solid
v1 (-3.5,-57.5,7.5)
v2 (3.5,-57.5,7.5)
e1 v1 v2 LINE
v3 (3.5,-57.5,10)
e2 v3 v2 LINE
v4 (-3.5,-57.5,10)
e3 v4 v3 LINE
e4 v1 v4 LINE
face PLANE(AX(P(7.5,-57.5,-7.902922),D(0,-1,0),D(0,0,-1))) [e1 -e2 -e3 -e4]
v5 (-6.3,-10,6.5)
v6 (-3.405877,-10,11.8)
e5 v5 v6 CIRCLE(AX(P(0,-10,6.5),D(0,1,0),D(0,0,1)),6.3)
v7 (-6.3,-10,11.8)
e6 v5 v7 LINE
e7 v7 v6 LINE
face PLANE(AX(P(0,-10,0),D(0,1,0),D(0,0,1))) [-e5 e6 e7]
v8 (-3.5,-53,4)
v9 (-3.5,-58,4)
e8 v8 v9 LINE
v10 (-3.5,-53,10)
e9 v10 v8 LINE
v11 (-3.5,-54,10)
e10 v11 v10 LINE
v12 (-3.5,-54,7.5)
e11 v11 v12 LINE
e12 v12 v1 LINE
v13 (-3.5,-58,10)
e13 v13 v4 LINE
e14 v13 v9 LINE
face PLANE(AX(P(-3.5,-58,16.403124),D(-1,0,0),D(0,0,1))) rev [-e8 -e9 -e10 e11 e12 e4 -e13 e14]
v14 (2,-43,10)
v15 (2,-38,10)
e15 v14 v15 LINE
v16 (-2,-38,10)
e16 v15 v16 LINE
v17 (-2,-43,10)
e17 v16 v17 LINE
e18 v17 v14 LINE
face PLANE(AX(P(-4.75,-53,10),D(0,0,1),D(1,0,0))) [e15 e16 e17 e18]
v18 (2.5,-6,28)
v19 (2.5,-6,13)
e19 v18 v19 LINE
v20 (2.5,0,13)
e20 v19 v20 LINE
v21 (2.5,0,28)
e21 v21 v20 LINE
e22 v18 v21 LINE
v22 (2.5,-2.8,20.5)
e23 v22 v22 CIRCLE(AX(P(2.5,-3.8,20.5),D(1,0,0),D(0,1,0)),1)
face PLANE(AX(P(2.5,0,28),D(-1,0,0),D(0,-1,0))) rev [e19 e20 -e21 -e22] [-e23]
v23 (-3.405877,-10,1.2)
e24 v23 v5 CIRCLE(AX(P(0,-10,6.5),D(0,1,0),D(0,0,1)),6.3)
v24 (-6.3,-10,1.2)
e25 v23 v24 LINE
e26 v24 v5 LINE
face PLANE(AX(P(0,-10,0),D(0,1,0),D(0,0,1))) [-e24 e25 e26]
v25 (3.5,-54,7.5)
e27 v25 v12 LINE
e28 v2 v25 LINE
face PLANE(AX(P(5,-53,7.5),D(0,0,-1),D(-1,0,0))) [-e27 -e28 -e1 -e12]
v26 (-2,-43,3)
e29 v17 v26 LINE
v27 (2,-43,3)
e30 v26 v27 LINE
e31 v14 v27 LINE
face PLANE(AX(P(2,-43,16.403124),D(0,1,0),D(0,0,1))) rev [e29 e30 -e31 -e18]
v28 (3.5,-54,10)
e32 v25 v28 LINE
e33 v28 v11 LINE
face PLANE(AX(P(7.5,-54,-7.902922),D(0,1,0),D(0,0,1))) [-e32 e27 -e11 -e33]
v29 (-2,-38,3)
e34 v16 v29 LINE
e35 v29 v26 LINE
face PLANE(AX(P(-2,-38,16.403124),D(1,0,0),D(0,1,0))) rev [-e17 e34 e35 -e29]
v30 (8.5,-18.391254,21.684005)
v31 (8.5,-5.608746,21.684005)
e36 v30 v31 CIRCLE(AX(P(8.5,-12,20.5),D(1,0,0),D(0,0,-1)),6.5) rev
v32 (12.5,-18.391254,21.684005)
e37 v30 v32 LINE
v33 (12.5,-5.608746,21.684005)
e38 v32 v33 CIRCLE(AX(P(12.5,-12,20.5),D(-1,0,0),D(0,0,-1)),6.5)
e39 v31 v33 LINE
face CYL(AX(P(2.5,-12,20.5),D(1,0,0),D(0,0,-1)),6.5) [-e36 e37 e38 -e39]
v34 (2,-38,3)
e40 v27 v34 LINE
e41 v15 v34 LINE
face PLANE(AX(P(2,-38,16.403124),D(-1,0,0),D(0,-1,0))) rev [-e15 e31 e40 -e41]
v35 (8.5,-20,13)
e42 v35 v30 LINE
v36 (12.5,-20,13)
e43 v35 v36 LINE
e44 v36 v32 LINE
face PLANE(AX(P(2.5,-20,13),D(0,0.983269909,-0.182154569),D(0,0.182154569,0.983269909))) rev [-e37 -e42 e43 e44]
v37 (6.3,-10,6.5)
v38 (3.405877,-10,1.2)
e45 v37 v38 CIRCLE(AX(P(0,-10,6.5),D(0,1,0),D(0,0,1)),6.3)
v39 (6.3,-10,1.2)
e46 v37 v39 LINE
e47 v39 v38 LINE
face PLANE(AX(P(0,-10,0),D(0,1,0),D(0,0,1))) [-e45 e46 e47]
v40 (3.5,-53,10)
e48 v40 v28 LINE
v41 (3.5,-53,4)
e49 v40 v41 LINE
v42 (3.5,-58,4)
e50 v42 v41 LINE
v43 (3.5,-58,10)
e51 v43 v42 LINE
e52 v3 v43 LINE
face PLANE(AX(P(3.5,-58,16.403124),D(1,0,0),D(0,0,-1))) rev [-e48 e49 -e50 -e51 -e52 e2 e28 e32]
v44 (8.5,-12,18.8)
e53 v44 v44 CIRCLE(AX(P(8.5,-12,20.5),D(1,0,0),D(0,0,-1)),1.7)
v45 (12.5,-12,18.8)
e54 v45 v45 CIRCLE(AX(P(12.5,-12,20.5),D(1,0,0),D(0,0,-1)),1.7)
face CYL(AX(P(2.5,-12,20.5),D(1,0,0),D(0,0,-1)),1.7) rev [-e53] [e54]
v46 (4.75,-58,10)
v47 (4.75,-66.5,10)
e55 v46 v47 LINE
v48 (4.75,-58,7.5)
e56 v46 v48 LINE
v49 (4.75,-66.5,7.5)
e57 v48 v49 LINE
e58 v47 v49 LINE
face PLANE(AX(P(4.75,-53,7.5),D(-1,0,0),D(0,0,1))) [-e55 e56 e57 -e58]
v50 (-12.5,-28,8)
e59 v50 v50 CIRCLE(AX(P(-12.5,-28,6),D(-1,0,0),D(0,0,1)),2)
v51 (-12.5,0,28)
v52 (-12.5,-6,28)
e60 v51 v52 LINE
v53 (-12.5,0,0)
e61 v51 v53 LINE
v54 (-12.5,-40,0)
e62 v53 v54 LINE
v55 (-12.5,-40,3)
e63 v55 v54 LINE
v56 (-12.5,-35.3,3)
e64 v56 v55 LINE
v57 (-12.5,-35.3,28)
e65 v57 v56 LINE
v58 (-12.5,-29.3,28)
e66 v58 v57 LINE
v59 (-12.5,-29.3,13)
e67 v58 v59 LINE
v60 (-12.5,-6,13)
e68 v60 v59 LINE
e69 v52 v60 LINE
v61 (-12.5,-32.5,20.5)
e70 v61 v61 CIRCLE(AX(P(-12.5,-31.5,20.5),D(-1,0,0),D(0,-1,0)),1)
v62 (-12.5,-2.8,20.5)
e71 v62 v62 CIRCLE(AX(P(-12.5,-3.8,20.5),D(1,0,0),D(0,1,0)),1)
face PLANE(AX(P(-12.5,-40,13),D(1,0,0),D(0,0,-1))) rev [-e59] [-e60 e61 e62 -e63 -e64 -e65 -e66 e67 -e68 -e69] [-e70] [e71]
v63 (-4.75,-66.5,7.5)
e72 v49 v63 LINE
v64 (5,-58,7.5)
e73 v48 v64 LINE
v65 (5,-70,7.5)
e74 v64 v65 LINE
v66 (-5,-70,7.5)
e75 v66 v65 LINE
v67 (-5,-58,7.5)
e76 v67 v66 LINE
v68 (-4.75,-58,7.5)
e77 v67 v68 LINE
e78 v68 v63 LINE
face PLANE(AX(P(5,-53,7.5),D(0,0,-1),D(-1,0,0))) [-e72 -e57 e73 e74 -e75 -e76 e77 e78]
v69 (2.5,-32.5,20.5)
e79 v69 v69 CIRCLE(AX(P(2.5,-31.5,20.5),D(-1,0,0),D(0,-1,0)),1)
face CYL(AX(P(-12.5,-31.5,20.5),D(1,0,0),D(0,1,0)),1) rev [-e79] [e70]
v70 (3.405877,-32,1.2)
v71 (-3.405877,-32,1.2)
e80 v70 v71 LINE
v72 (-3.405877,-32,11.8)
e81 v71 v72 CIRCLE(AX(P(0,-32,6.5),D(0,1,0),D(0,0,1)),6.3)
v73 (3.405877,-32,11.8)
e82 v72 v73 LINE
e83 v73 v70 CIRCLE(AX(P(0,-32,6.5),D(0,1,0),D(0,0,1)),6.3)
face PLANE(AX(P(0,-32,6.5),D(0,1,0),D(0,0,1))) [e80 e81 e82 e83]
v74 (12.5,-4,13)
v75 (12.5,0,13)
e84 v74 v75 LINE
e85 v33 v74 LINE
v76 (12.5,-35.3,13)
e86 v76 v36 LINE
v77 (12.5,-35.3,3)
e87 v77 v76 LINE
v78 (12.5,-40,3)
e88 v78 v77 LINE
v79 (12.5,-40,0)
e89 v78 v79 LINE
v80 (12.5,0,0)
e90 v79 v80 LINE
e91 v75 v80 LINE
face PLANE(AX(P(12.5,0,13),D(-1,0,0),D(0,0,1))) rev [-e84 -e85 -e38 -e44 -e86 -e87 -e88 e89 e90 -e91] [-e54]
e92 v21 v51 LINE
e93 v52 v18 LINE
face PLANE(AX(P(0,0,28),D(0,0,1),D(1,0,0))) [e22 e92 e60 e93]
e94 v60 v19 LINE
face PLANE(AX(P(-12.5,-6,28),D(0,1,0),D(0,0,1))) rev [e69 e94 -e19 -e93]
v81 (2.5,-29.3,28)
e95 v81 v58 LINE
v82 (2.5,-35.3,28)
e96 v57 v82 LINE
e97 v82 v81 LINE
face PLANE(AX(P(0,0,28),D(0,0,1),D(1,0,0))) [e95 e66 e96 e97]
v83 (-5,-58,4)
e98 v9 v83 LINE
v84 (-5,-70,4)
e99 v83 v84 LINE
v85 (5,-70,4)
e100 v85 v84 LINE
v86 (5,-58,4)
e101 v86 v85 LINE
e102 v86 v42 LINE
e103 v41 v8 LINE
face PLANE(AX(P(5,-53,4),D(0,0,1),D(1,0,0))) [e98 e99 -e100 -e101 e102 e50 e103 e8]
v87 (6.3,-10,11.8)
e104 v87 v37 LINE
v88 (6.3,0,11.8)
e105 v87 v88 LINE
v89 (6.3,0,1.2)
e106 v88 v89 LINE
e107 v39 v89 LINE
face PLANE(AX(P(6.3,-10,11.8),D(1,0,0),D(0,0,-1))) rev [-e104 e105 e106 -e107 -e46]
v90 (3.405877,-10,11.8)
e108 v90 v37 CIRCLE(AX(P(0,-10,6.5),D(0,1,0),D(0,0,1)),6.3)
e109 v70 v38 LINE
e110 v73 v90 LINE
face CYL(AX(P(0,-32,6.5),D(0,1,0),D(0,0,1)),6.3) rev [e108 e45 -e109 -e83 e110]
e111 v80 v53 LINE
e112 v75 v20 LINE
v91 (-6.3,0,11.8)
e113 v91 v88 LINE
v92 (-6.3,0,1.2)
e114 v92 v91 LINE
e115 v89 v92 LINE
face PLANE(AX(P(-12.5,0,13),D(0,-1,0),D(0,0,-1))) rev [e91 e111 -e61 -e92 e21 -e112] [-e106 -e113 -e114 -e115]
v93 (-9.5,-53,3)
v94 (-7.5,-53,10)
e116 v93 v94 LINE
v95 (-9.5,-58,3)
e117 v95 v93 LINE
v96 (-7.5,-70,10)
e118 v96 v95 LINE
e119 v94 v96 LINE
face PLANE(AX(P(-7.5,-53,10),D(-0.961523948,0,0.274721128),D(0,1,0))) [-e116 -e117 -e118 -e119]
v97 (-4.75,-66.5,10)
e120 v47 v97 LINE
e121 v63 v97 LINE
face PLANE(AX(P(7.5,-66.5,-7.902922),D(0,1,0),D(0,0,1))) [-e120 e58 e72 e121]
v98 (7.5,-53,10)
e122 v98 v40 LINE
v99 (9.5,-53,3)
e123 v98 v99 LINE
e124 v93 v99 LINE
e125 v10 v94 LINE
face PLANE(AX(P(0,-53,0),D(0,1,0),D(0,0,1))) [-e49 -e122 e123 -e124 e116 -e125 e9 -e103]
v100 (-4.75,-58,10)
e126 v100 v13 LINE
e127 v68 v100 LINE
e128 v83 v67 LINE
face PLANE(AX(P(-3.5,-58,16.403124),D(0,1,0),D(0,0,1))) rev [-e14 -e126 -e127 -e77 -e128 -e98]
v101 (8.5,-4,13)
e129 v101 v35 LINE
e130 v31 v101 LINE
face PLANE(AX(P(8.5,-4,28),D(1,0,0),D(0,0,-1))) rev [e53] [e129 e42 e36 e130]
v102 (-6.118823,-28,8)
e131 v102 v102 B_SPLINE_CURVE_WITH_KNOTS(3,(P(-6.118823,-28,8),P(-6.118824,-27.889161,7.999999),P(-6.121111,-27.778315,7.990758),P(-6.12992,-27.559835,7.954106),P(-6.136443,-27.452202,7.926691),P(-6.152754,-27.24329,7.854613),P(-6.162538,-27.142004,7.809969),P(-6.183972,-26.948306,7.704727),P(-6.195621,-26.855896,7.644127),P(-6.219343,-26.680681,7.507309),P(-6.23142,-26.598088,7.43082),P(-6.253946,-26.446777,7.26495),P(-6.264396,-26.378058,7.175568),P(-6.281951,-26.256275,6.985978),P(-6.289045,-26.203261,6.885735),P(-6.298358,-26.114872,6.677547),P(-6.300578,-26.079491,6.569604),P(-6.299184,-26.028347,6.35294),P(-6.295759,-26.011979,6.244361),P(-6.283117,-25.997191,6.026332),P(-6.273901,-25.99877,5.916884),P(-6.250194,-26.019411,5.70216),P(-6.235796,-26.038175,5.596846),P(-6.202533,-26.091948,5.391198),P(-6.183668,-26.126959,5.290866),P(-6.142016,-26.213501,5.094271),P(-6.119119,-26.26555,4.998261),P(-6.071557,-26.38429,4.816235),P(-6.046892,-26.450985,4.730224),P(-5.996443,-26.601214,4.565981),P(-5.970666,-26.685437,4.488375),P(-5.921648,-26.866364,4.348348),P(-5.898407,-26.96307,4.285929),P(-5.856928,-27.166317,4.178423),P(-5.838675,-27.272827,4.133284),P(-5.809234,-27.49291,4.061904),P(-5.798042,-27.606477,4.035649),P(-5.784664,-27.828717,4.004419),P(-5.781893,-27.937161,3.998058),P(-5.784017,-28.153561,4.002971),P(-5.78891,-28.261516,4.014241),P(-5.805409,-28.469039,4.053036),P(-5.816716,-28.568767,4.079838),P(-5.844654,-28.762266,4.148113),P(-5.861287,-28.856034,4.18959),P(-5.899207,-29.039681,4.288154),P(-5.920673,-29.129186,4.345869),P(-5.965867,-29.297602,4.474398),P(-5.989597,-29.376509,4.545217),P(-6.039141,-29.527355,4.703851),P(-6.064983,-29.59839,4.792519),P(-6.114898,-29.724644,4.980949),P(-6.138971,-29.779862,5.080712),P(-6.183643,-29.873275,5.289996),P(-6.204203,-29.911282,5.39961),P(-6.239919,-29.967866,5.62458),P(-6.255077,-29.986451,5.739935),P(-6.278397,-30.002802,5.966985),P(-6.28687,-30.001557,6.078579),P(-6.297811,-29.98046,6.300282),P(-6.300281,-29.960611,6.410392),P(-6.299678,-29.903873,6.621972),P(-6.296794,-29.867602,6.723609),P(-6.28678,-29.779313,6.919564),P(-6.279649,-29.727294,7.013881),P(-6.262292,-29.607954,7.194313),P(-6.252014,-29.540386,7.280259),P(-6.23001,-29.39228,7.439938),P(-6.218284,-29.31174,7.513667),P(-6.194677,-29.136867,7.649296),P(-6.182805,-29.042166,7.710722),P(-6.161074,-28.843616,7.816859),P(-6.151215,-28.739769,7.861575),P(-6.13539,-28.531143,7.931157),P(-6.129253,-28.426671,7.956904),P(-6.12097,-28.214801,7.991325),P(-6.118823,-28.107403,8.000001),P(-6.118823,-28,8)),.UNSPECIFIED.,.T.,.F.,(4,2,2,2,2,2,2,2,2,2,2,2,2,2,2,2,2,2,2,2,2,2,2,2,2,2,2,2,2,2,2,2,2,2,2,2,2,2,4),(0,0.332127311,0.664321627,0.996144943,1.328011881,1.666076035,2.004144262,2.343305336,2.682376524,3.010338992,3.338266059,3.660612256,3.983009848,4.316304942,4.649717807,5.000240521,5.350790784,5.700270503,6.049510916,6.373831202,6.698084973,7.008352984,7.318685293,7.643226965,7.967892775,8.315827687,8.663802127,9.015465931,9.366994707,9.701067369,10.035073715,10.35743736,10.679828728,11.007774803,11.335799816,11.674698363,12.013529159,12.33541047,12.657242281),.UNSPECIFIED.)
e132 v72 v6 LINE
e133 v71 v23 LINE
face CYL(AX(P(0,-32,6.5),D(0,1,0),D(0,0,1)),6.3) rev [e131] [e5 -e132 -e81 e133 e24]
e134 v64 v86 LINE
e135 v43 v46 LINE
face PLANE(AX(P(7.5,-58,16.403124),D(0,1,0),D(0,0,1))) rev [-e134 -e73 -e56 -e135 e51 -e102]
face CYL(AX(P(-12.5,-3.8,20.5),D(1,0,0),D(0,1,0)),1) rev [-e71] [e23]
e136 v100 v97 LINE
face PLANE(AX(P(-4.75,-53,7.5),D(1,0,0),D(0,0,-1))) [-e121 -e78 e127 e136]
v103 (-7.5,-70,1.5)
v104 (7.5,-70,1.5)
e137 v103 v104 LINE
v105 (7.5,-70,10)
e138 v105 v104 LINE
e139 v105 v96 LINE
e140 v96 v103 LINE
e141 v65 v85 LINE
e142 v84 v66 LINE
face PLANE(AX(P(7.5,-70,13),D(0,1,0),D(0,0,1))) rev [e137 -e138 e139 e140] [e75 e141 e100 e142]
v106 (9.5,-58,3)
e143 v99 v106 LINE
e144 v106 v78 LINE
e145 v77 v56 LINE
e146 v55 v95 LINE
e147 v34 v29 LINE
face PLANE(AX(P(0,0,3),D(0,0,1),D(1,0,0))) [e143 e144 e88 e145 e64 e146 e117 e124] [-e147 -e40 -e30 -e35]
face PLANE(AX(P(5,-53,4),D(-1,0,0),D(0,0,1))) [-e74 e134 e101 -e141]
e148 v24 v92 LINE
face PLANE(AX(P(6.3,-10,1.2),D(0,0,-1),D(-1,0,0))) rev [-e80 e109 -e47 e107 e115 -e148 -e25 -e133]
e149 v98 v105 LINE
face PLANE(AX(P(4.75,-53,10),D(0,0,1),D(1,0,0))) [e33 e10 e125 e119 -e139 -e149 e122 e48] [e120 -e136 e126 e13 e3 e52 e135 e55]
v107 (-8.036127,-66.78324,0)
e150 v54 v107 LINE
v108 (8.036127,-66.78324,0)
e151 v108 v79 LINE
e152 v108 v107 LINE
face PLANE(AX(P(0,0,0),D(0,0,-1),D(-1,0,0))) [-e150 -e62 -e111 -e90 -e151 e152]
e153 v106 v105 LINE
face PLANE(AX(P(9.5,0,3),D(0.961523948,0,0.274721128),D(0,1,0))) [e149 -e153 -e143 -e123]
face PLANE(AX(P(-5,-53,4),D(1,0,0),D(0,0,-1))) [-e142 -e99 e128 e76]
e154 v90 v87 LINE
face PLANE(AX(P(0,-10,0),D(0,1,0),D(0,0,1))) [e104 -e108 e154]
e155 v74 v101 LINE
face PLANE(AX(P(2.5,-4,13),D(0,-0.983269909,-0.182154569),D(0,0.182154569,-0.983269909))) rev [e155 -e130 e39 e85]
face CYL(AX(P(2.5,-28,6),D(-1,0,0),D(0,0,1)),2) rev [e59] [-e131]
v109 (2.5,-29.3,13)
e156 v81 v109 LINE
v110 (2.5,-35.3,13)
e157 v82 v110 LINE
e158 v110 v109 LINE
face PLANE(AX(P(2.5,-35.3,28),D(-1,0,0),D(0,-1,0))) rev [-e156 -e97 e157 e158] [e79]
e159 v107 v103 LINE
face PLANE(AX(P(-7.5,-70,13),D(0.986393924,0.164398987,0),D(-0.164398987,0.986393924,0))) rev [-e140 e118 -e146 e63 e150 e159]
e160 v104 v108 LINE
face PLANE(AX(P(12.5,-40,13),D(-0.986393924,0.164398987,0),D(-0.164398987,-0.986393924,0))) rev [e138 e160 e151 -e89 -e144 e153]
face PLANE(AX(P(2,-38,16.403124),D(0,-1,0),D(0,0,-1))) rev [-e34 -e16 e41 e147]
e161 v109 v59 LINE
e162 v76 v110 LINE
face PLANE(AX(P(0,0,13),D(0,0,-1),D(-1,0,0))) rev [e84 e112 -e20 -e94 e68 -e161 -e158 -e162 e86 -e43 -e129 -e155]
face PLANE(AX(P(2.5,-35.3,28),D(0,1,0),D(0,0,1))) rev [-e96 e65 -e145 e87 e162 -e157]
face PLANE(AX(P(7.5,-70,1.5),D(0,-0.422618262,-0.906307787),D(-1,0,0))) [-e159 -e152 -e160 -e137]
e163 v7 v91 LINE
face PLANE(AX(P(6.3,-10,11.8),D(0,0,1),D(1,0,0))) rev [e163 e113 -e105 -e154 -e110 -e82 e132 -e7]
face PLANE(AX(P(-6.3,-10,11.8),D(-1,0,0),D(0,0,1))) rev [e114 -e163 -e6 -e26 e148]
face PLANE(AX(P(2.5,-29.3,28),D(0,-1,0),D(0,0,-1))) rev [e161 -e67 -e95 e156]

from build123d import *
from OCP.BRepFilletAPI import BRepFilletAPI_MakeChamfer

# Parameters (mm, degrees)
RESSALTO_EXTRUS_O1_DEPTH = 13
ESBO_O2_W                = 15
ESBO_O2_H                = 6
ESBO_O2_W_2              = 4
ESBO_O2_H_2              = 16
RESSALTO_EXTRUS_O2_DEPTH = 15
ESBO_O3_R                = 1
CORTE_EXTRUS_O1_DEPTH    = 77.870020164
ESBO_O10_R               = 1.7
CORTE_EXTRUS_O4_DEPTH    = 10
ESBO_O11_W               = 25
ESBO_O11_H               = 34.7
CORTE_EXTRUS_O5_DEPTH    = 10
RESSALTO_EXTRUS_O3_DEPTH = 17
RESSALTO_EXTRUS_O4_REACH = 77.374
ESBO_O7_W                = 4
ESBO_O7_H                = 5
ESBO_O8_W                = 15
ESBO_O8_H                = 3.5
RESSALTO_EXTRUS_O5_DEPTH = 2.5
CHANFRO2_SIZE            = 2
CHANFRO2_SIZE_2          = 7
CHANFRO3_SIZE            = 1.5
CHANFRO3_SIZE2           = 3.216760381
ESBO_O12_W               = 12.6
ESBO_O12_H               = 10.6
CORTE_EXTRUS_O6_DEPTH    = 10
CORTE_EXTRUS_O7_DEPTH    = 22
ESBO_O15_R               = 2
CORTE_EXTRUS_O9_DEPTH    = 15


with BuildPart() as part:
    # Esboço1 → Ressalto-extrusão1 (new body)
    with BuildSketch(Plane.XY):
        Polygon((-12.5, 0), (12.5, 0), (12.5, -40), (7.5, -70), (-7.5, -70), (-12.5, -40), align=None)
    extrude(amount=RESSALTO_EXTRUS_O1_DEPTH)

    # Esboço2 → Ressalto-extrusão2 (add)
    with BuildSketch(Plane.XY.offset(13)):
        with Locations((-5, -32.3)):
            Rectangle(ESBO_O2_W, ESBO_O2_H)
        with Locations((-5, -3)):
            Rectangle(ESBO_O2_W, ESBO_O2_H)
        with Locations((10.5, -12)):
            Rectangle(ESBO_O2_W_2, ESBO_O2_H_2)
    extrude(amount=RESSALTO_EXTRUS_O2_DEPTH)

    # Esboço3 → Corte-extrusão1 (cut, through all)
    with BuildSketch(Plane(origin=(2.5, 0, 0), x_dir=(0, 0, -1), z_dir=(1, 0, 0))):
        with Locations(Location((-20.5, -3.8, 0), (0, 0, 90))):
            Circle(ESBO_O3_R)
        with Locations(Location((-20.5, -31.5, 0), (0, 0, 270))):
            Circle(ESBO_O3_R)
    extrude(amount=-CORTE_EXTRUS_O1_DEPTH, mode=Mode.SUBTRACT)

    # Esboço10 → Corte-extrusão4 (cut)
    with BuildSketch(Plane(origin=(12.5, 0, 0), x_dir=(0, 0, -1), z_dir=(1, 0, 0))):
        with Locations((-20.5, -12)):
            Circle(ESBO_O10_R)
        with BuildLine():
            Line((-13, -4), (-28, -4))
            Line((-28, -4), (-28, -20))
            Line((-28, -20), (-13, -20))
            Line((-13, -20), (-21.684004699, -18.391254405))
            ThreePointArc((-21.684004699, -18.391254405), (-27, -12), (-21.684004699, -5.608745595))
            Line((-21.684004699, -5.608745595), (-13, -4))
        make_face()
    extrude(amount=-CORTE_EXTRUS_O4_DEPTH, mode=Mode.SUBTRACT)

    # Esboço11 → Corte-extrusão5 (cut)
    with BuildSketch(Plane.XY.offset(13)):
        with Locations((0, -52.65)):
            Rectangle(ESBO_O11_W, ESBO_O11_H)
    extrude(amount=-CORTE_EXTRUS_O5_DEPTH, mode=Mode.SUBTRACT)

    # Esboço6 → Ressalto-extrusão3 (add)
    with BuildSketch(Plane.XZ.offset(70)):
        Polygon((-5, 4), (-5, 7.5), (-4.75, 7.5), (-4.75, 10), (-7.5, 10), (-7.5, 3), (7.5, 3), (7.5, 10), (4.75, 10), (4.75, 7.5), (5, 7.5), (5, 4), align=None)
    extrude(amount=-RESSALTO_EXTRUS_O3_DEPTH)

    # Ressalto-extrusão4: up to this face of the body (flat: up to its plane)
    ressalto_extrus_o4_end = Plane(part.part.faces().sort_by_distance((-6.125, -61.5, 10))[0])
    # Esboço7 → Ressalto-extrusão4 (add, up to the picked face)
    with BuildSketch(Plane.XY.offset(3), mode=Mode.PRIVATE) as ressalto_extrus_o4_sk1:
        with Locations((0, -40.5)):
            Rectangle(ESBO_O7_W, ESBO_O7_H)
    ressalto_extrus_o4_tool1 = split(extrude(ressalto_extrus_o4_sk1.sketch, amount=RESSALTO_EXTRUS_O4_REACH, mode=Mode.PRIVATE), bisect_by=ressalto_extrus_o4_end, keep=Keep.BOTH, mode=Mode.PRIVATE)
    # Esboço7 → Ressalto-extrusão4 (add, up to the picked face)
    with BuildSketch(Plane.XY.offset(3), mode=Mode.PRIVATE) as ressalto_extrus_o4_sk2:
        with Locations((5.5, -55.5)):
            Rectangle(ESBO_O7_W, ESBO_O7_H)
    ressalto_extrus_o4_tool2 = split(extrude(ressalto_extrus_o4_sk2.sketch, amount=RESSALTO_EXTRUS_O4_REACH, mode=Mode.PRIVATE), bisect_by=ressalto_extrus_o4_end, keep=Keep.BOTH, mode=Mode.PRIVATE)
    # Esboço7 → Ressalto-extrusão4 (add, up to the picked face)
    with BuildSketch(Plane.XY.offset(3), mode=Mode.PRIVATE) as ressalto_extrus_o4_sk3:
        with Locations((-5.5, -55.5)):
            Rectangle(ESBO_O7_W, ESBO_O7_H)
    ressalto_extrus_o4_tool3 = split(extrude(ressalto_extrus_o4_sk3.sketch, amount=RESSALTO_EXTRUS_O4_REACH, mode=Mode.PRIVATE), bisect_by=ressalto_extrus_o4_end, keep=Keep.BOTH, mode=Mode.PRIVATE)
    add(ressalto_extrus_o4_tool1.solids().sort_by(Axis((0, -40.5, 3), (0, 0, 1)))[0])
    add(ressalto_extrus_o4_tool2.solids().sort_by(Axis((5.5, -55.5, 3), (0, 0, 1)))[0])
    add(ressalto_extrus_o4_tool3.solids().sort_by(Axis((-5.5, -55.5, 3), (0, 0, 1)))[0])

    # Esboço8 → Ressalto-extrusão5 (add)
    with BuildSketch(Plane.XY.offset(10)):
        with Locations((0, -68.25)):
            Rectangle(ESBO_O8_W, ESBO_O8_H)
        with Locations((0, -55.75)):
            Rectangle(ESBO_O8_W, ESBO_O8_H)
    extrude(amount=-RESSALTO_EXTRUS_O5_DEPTH)

    # Chanfro2
    chanfro2_edges_1 = [part.edges().sort_by_distance(p)[0] for p in [
        (7.5, -61.5, 3),
    ]]
    chanfro2_side_1 = [part.faces().sort_by_distance(p)[0] for p in [
        (7.54, -61.5, 3),
    ]]
    chanfro2_edges_2 = [part.edges().sort_by_distance(p)[0] for p in [
        (-7.5, -61.5, 3),
    ]]
    chanfro2_side_2 = [part.faces().sort_by_distance(p)[0] for p in [
        (-7.54, -61.5, 3),
    ]]
    chanfro2 = BRepFilletAPI_MakeChamfer(part.part.solid().wrapped)
    for e in chanfro2_edges_1:
        chanfro2.Add(CHANFRO2_SIZE - 0.0001, CHANFRO2_SIZE_2 - 0.0001, e.wrapped, chanfro2_side_1[0].wrapped)
    for e in chanfro2_edges_2:
        chanfro2.Add(CHANFRO2_SIZE - 0.0001, CHANFRO2_SIZE_2 - 0.0001, e.wrapped, chanfro2_side_2[0].wrapped)
    add(Compound.cast(chanfro2.Shape()), mode=Mode.REPLACE)  # a hair under: the kernel refuses the full size

    # Chanfro3
    chanfro3_edges = [part.edges().sort_by_distance(p)[0] for p in [
        (0, -70, 0),
    ]]
    chanfro3_side = [part.faces().sort_by_distance(p)[0] for p in [
        (7.319722436, -70, 9.99995),
    ]]
    chamfer(chanfro3_edges, length=CHANFRO3_SIZE, length2=CHANFRO3_SIZE2, reference=chanfro3_side[0])

    # Esboço12 → Corte-extrusão6 (cut)
    with BuildSketch(Plane(origin=(0, 0, 0), x_dir=(1, 0, 0), z_dir=(0, 1, 0))):
        with Locations((0, -6.5)):
            Rectangle(ESBO_O12_W, ESBO_O12_H)
    extrude(amount=-CORTE_EXTRUS_O6_DEPTH, mode=Mode.SUBTRACT)

    # Esboço13 → Corte-extrusão7 (cut)
    with BuildSketch(Plane(origin=(0, -10, 0), x_dir=(1, 0, 0), z_dir=(0, 1, 0))):
        with BuildLine():
            Line((-3.405877273, -11.8), (3.405877273, -11.8))
            ThreePointArc((3.405877273, -11.8), (6.3, -6.5), (3.405877273, -1.2))
            Line((3.405877273, -1.2), (-3.405877273, -1.2))
            ThreePointArc((-3.405877273, -1.2), (-6.3, -6.5), (-3.405877273, -11.8))
        make_face()
    extrude(amount=-CORTE_EXTRUS_O7_DEPTH, mode=Mode.SUBTRACT)

    # Esboço15 → Corte-extrusão9 (cut)
    with BuildSketch(Plane.ZY.offset(12.5)):
        with Locations((6, -28)):
            Circle(ESBO_O15_R)
    extrude(amount=-CORTE_EXTRUS_O9_DEPTH, mode=Mode.SUBTRACT)


solid = part.part
